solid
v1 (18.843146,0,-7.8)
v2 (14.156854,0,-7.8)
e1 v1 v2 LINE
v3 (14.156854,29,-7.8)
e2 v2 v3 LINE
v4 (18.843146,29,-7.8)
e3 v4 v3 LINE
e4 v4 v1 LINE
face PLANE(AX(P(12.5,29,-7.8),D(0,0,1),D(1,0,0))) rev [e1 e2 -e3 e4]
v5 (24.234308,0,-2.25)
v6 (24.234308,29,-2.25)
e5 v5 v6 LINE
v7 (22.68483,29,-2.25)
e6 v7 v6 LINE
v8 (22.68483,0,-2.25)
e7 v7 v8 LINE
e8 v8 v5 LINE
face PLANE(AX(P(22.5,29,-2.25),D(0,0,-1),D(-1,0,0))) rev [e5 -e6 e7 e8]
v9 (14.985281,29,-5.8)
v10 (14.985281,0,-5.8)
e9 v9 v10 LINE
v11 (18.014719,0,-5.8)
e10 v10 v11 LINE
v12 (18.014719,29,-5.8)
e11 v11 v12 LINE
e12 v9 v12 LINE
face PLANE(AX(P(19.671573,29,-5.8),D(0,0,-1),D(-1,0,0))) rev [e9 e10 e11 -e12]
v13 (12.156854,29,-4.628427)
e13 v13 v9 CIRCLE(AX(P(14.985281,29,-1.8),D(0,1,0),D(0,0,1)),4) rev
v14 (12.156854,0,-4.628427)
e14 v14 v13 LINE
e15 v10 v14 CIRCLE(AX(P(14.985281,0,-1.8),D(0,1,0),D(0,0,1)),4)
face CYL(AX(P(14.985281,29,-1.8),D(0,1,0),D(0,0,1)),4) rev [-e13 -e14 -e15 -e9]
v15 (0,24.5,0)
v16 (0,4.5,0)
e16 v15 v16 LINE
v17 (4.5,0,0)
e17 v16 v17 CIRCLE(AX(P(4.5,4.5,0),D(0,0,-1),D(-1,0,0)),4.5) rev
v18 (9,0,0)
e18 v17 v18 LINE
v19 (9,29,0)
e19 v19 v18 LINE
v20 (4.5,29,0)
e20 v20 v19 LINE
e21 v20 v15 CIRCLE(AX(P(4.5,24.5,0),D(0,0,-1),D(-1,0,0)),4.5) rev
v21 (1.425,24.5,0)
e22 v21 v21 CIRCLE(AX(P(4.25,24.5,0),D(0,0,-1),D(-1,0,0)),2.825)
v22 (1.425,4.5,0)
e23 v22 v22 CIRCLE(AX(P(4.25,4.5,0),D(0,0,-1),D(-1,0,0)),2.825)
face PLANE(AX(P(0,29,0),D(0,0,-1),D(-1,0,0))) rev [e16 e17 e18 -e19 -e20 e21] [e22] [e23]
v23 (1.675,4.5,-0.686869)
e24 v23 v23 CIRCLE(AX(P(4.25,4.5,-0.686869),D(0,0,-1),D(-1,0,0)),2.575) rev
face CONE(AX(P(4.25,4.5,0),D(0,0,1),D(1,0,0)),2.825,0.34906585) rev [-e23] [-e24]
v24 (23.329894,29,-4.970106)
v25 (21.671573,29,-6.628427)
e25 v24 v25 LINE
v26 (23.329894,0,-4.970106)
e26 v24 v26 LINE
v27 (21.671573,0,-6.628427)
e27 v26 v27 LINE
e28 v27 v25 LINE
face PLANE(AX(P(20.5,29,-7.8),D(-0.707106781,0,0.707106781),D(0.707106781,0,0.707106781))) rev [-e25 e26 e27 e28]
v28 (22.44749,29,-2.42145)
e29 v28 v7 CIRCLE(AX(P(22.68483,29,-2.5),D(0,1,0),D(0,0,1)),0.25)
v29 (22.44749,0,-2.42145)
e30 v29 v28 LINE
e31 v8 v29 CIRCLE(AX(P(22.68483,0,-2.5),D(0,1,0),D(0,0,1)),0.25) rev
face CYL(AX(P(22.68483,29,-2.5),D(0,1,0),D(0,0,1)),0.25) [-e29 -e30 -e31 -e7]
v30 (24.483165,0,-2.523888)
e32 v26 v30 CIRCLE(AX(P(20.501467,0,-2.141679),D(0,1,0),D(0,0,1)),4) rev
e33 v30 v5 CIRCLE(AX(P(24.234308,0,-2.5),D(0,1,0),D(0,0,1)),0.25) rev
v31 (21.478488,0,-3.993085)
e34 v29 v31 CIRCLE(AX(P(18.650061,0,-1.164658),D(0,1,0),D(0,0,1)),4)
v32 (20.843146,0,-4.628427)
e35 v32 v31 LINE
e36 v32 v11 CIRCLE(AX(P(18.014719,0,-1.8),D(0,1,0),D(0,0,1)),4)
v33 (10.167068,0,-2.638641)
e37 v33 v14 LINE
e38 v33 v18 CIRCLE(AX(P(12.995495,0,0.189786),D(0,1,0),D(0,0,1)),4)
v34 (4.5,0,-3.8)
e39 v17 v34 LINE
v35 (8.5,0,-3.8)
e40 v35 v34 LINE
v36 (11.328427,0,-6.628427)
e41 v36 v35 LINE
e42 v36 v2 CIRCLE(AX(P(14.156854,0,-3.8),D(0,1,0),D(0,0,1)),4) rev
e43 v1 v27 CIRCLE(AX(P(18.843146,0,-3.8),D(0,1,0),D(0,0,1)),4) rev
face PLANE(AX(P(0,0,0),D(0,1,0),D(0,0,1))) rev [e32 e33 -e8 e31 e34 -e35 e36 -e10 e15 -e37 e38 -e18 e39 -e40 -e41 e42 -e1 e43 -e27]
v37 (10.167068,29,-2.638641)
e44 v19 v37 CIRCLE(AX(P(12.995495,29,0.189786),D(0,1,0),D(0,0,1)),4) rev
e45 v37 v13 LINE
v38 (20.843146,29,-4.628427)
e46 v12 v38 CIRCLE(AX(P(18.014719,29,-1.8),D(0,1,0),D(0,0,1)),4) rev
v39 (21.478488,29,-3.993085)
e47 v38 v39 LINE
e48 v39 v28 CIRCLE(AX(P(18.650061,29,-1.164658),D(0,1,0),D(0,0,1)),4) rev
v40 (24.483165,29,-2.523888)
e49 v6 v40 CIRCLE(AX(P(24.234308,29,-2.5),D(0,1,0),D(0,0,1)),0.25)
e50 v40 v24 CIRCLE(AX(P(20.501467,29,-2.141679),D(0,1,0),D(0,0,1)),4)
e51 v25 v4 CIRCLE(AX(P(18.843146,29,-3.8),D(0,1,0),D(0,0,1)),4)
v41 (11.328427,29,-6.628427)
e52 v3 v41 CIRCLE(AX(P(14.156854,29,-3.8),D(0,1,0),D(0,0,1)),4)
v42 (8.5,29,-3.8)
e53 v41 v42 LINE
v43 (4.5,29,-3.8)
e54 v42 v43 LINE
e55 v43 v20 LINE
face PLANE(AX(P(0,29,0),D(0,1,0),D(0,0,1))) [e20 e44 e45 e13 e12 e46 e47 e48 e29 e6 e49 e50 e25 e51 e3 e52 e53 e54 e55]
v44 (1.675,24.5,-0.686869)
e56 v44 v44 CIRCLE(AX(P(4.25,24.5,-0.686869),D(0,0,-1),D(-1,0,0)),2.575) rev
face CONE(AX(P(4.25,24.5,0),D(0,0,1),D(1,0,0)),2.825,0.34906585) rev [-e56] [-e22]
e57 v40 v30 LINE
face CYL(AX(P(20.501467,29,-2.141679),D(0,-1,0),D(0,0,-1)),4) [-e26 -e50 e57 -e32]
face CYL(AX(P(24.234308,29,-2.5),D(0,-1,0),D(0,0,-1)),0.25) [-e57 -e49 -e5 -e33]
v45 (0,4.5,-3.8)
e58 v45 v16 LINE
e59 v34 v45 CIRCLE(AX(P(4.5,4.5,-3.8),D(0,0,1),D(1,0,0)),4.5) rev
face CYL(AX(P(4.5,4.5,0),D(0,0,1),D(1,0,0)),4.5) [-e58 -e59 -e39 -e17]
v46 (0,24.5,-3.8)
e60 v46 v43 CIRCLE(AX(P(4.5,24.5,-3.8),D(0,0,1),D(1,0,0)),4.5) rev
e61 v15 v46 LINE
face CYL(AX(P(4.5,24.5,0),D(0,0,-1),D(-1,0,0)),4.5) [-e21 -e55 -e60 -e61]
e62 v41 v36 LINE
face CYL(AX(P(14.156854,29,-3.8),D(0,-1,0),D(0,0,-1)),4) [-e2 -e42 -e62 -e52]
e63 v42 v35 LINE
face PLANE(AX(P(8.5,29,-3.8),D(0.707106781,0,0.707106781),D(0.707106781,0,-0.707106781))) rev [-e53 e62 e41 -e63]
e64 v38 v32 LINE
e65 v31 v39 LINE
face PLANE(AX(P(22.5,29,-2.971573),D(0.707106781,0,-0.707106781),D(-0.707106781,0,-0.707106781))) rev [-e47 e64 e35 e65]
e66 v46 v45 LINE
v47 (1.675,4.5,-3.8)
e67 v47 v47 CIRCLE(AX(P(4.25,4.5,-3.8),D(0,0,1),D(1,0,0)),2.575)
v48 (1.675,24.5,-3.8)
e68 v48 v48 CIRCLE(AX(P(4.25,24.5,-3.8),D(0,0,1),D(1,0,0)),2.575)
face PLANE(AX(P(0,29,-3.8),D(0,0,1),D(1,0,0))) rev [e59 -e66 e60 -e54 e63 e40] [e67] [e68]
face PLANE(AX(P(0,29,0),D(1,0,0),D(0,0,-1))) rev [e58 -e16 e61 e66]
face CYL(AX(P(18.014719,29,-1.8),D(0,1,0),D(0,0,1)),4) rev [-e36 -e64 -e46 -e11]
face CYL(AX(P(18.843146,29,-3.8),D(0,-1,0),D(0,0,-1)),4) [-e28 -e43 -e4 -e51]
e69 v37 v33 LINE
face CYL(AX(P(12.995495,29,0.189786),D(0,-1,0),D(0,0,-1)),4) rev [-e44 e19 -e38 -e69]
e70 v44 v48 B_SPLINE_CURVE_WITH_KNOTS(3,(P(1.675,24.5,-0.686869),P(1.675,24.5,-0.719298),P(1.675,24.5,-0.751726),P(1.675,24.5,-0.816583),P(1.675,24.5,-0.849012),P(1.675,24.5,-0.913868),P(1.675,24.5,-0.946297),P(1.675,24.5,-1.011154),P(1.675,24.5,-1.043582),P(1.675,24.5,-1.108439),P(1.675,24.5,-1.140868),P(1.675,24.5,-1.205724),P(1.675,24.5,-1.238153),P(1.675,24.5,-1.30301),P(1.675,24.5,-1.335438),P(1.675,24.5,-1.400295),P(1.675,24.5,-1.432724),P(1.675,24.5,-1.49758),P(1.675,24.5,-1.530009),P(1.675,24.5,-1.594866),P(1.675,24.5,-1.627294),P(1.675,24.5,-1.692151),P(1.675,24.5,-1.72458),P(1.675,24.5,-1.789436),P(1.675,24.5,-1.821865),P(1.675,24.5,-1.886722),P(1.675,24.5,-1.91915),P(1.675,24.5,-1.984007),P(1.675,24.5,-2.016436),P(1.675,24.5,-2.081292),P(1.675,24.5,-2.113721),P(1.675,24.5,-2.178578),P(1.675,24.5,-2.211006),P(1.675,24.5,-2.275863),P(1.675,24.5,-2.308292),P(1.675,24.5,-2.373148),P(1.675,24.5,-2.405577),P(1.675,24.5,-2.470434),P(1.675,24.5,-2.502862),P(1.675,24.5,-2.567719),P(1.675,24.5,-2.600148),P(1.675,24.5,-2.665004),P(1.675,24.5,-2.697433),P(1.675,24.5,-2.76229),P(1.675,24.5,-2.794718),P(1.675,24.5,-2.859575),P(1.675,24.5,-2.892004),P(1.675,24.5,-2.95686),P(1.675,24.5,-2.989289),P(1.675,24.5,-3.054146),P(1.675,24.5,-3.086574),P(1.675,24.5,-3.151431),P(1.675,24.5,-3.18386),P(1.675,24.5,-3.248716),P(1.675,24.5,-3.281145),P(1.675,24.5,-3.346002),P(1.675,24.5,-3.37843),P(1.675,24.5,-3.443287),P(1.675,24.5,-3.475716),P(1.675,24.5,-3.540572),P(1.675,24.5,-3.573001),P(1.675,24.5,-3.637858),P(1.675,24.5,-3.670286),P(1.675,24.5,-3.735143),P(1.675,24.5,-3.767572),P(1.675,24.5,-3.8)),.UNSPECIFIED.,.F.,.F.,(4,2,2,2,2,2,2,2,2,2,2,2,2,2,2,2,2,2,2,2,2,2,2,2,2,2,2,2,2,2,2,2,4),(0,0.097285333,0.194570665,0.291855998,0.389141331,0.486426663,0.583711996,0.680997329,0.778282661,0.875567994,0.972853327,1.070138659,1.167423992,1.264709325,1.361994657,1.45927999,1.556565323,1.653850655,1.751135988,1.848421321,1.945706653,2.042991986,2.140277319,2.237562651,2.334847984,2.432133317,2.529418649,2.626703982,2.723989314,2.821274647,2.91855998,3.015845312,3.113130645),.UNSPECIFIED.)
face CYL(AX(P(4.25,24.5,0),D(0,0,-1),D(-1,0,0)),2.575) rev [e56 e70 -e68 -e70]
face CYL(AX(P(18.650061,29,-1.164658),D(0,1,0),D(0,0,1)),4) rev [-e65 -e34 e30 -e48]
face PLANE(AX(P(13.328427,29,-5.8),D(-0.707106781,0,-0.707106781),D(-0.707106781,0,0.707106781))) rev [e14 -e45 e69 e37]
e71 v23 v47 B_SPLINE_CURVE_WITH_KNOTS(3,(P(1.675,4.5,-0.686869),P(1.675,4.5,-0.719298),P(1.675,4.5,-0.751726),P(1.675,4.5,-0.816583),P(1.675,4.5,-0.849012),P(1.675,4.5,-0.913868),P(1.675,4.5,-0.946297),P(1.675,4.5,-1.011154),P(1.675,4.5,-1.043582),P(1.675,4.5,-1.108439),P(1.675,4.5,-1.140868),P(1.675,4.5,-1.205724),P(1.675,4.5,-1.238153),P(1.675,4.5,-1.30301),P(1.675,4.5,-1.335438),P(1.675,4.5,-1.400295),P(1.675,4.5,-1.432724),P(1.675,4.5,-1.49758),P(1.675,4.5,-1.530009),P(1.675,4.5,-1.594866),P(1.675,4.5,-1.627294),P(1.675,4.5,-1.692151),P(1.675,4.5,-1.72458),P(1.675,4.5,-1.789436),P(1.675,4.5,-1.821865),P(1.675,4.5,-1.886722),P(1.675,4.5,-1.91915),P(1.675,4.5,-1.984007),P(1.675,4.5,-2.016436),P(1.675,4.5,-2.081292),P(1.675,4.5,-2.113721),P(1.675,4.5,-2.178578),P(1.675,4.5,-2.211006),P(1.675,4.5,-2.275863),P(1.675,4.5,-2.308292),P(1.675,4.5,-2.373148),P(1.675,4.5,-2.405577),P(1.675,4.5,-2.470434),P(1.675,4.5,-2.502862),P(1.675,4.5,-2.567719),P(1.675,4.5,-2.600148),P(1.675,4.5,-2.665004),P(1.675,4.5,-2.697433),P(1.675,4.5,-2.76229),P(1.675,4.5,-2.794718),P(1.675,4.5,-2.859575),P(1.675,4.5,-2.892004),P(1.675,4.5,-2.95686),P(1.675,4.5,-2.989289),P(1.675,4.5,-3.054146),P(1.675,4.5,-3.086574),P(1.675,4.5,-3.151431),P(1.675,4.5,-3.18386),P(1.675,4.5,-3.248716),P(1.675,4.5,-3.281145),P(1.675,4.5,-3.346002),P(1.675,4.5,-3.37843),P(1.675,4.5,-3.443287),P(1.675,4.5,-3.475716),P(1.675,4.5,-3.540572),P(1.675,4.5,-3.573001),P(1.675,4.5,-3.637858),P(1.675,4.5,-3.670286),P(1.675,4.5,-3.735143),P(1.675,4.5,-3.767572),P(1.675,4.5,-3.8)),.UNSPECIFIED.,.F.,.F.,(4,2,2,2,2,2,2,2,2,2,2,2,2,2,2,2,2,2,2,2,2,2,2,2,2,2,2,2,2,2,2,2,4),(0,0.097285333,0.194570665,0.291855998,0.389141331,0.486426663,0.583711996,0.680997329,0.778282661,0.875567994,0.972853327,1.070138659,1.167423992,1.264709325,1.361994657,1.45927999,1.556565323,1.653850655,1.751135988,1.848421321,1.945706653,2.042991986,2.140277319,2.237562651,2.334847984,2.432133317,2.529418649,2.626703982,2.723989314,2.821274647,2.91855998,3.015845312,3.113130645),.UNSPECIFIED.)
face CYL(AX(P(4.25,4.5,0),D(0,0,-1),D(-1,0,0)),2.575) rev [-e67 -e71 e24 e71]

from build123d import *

# Parameters (mm, degrees)
BOSS_EXTRUDE1_DEPTH     = 29
CUT_EXTRUDE1_DEPTH      = 39.173943993
CUT_EXTRUDE1_DEPTH_BACK = 39.173943993
SKETCH2_R               = 2.575
FILLET1_R               = 4.5
FILLET2_R               = 4
CHAMFER1_SIZE           = 0.25
CHAMFER1_SIZE2          = 0.686869355
FILLET4_R               = 0.25


with BuildPart() as part:
    # Sketch1 → Boss-Extrude1 (new body)
    with BuildSketch(Plane(origin=(0, 0, 0), x_dir=(1, 0, 0), z_dir=(0, 1, 0))):
        Polygon((0, 0), (0, 3.8), (8.5, 3.8), (12.5, 7.8), (20.5, 7.8), (24.5, 3.8), (24.5, 2.25), (22.5, 2.25), (22.5, 2.971572875), (19.671572875, 5.8), (13.328427125, 5.8), (9, 1.471572875), (9, 0), align=None)
    extrude(amount=BOSS_EXTRUDE1_DEPTH)

    # Sketch2 → Cut-Extrude1 (cut, two sides: drawn at the far end of the back side and taken through both)
    with BuildSketch(Plane(origin=(0, 0, -3.8), x_dir=(-1, 0, 0), z_dir=(0, 0, -1)).offset(-CUT_EXTRUDE1_DEPTH_BACK)):
        with Locations((-4.25, 4.5)):
            Circle(SKETCH2_R)
        with Locations((-4.25, 24.5)):
            Circle(SKETCH2_R)
    extrude(amount=CUT_EXTRUDE1_DEPTH + CUT_EXTRUDE1_DEPTH_BACK, mode=Mode.SUBTRACT)

    # Fillet1
    fillet1_edges = [part.edges().sort_by_distance(p)[0] for p in [
        (0, 0, -1.9),
        (0, 29, -1.9),
    ]]
    fillet(fillet1_edges, radius=FILLET1_R)

    # Fillet2
    # the kernel refuses this fillet: 4 mm, written as the material it adds along each edge
    with BuildSketch(Plane(origin=(9, 0, -1.471572875), x_dir=(0, 0, 1), z_dir=(0, 1, 0))) as fillet2_piece_1:
        with BuildLine():
            CenterArc((1.66135914, 3.99549511), FILLET2_R, 225, 42.280491011)
            Line((-1.167067985, 1.167067985), (-1.223636528, 1.110499443))
            Line((-1.223636528, 1.110499443), (-0.056568542, -0.056568542))
            Line((-0.056568542, -0.056568542), (0, -0.08))
            ThreePointArc((0, -0.08), (0.735786438, -0.08), (1.46777715, -0.079909902))
            Line((1.46777715, -0.079909902), (1.471572875, 0))
        make_face()
    extrude(amount=29)
    with BuildSketch(Plane(origin=(19.671572875, 0, -5.8), x_dir=(-1, 0, 0), z_dir=(0, 1, 0)), Plane(origin=(13.328427125, 0, -5.8), x_dir=(-0.7071067811865457, 0, 0.7071067811865493), z_dir=(0, 1, 0))) as fillet2_piece_2:
        with BuildLine():
            CenterArc((FILLET2_R * 0.414213562373, FILLET2_R), FILLET2_R, 225, 45)
            Line((-FILLET2_R * 0.292893218813, FILLET2_R * 0.292893218813), (-FILLET2_R * 0.307035354437, FILLET2_R * 0.27875108319))
            Line((-FILLET2_R * 0.307035354437, FILLET2_R * 0.27875108319), (-FILLET2_R * 0.00828427124746, -FILLET2_R * 0.02))
            Line((-FILLET2_R * 0.00828427124746, -FILLET2_R * 0.02), (FILLET2_R * 0.414213562373, -FILLET2_R * 0.02))
            Line((FILLET2_R * 0.414213562373, -FILLET2_R * 0.02), (FILLET2_R * 0.414213562373, 0))
        make_face()
    extrude(amount=29)
    with BuildSketch(Plane(origin=(22.5, 0, -2.971572875), x_dir=(-0.7071067811865455, 0, -0.7071067811865495), z_dir=(0, 1, 0))) as fillet2_piece_3:
        with BuildLine():
            CenterArc((1.444636364, 4), FILLET2_R, 240.743753532, 29.256246468)
            Line((-0.510229073, 0.510229073), (-0.549326382, 0.440433655))
            ThreePointArc((-0.549326382, 0.440433655), (-0.311683079, 0.198545994), (-0.056568542, -0.056568542))
            Line((-0.056568542, -0.056568542), (0, -0.08))
            Line((0, -0.08), (1.444636364, -0.08))
            Line((1.444636364, -0.08), (1.444636364, 0))
        make_face()
    extrude(amount=29)
    # the kernel refuses this fillet: 4 mm, written as the material it takes off along each edge
    with BuildSketch(Plane(origin=(20.5, -4.142135624, -7.8), x_dir=(0.7071067811865446, 0, 0.7071067811865505), z_dir=(0, 1, 0))) as fillet2_2_piece_1:
        with BuildLine():
            CenterArc((FILLET2_R * 0.414213562373, -FILLET2_R), FILLET2_R, 90, 45)
            Line((-FILLET2_R * 0.292893218813, -FILLET2_R * 0.292893218813), (-FILLET2_R * 0.307035354437, -FILLET2_R * 0.27875108319))
            Line((-FILLET2_R * 0.307035354437, -FILLET2_R * 0.27875108319), (-FILLET2_R * 0.00828427124746, FILLET2_R * 0.02))
            Line((-FILLET2_R * 0.00828427124746, FILLET2_R * 0.02), (FILLET2_R * 0.414213562373, FILLET2_R * 0.02))
            Line((FILLET2_R * 0.414213562373, FILLET2_R * 0.02), (FILLET2_R * 0.414213562373, 0))
        make_face()
    extrude(amount=37.284271247, mode=Mode.SUBTRACT)
    with BuildSketch(Plane(origin=(12.5, -4.142135624, -7.8), x_dir=(-0.7071067811865461, 0, 0.7071067811865489), z_dir=(0, 1, 0))) as fillet2_2_piece_2:
        with BuildLine():
            CenterArc((FILLET2_R * 0.414213562373, FILLET2_R), FILLET2_R, 225, 45)
            Line((-FILLET2_R * 0.292893218813, FILLET2_R * 0.292893218813), (-FILLET2_R * 0.307035354437, FILLET2_R * 0.27875108319))
            Line((-FILLET2_R * 0.307035354437, FILLET2_R * 0.27875108319), (-FILLET2_R * 0.00828427124746, -FILLET2_R * 0.02))
            Line((-FILLET2_R * 0.00828427124746, -FILLET2_R * 0.02), (FILLET2_R * 0.414213562373, -FILLET2_R * 0.02))
            Line((FILLET2_R * 0.414213562373, -FILLET2_R * 0.02), (FILLET2_R * 0.414213562373, 0))
        make_face()
    extrude(amount=37.284271247, mode=Mode.SUBTRACT)
    with BuildSketch(Plane(origin=(24.5, -4.136949157, -3.8), x_dir=(0, 0, 1), z_dir=(0, 1, 0))) as fillet2_2_piece_3:
        with BuildLine():
            CenterArc((1.658321204, -3.998533046), FILLET2_R, 91.551776657, 43.448223343)
            Line((-1.170105921, -1.170105921), (-1.226674463, -1.113537378))
            Line((-1.226674463, -1.113537378), (-0.056568542, 0.056568542))
            Line((-0.056568542, 0.056568542), (0, 0.08))
            ThreePointArc((0, 0.08), (0.775, 0.08), (1.547833576, 0.079970661))
            Line((1.547833576, 0.079970661), (1.55, 0))
        make_face()
    extrude(amount=37.273898313, mode=Mode.SUBTRACT)

    # Chamfer1
    chamfer1_edges = [part.edges().sort_by_distance(p)[0] for p in [
        (6.825, 4.5, 0),
        (6.825, 24.5, 0),
    ]]
    chamfer1_side = [part.faces().sort_by_distance(p)[0] for p in [
        (4.693643045, 14.5, 0),
    ]]
    chamfer(chamfer1_edges, length=CHAMFER1_SIZE, length2=CHAMFER1_SIZE2, reference=chamfer1_side[0])

    # Fillet4
    fillet4_edges = [part.edges().sort_by_distance(p)[0] for p in [
        (24.5, 14.5, -2.25),
        (22.5, 14.5, -2.25),
    ]]
    fillet(fillet4_edges, radius=FILLET4_R)


solid = part.part
